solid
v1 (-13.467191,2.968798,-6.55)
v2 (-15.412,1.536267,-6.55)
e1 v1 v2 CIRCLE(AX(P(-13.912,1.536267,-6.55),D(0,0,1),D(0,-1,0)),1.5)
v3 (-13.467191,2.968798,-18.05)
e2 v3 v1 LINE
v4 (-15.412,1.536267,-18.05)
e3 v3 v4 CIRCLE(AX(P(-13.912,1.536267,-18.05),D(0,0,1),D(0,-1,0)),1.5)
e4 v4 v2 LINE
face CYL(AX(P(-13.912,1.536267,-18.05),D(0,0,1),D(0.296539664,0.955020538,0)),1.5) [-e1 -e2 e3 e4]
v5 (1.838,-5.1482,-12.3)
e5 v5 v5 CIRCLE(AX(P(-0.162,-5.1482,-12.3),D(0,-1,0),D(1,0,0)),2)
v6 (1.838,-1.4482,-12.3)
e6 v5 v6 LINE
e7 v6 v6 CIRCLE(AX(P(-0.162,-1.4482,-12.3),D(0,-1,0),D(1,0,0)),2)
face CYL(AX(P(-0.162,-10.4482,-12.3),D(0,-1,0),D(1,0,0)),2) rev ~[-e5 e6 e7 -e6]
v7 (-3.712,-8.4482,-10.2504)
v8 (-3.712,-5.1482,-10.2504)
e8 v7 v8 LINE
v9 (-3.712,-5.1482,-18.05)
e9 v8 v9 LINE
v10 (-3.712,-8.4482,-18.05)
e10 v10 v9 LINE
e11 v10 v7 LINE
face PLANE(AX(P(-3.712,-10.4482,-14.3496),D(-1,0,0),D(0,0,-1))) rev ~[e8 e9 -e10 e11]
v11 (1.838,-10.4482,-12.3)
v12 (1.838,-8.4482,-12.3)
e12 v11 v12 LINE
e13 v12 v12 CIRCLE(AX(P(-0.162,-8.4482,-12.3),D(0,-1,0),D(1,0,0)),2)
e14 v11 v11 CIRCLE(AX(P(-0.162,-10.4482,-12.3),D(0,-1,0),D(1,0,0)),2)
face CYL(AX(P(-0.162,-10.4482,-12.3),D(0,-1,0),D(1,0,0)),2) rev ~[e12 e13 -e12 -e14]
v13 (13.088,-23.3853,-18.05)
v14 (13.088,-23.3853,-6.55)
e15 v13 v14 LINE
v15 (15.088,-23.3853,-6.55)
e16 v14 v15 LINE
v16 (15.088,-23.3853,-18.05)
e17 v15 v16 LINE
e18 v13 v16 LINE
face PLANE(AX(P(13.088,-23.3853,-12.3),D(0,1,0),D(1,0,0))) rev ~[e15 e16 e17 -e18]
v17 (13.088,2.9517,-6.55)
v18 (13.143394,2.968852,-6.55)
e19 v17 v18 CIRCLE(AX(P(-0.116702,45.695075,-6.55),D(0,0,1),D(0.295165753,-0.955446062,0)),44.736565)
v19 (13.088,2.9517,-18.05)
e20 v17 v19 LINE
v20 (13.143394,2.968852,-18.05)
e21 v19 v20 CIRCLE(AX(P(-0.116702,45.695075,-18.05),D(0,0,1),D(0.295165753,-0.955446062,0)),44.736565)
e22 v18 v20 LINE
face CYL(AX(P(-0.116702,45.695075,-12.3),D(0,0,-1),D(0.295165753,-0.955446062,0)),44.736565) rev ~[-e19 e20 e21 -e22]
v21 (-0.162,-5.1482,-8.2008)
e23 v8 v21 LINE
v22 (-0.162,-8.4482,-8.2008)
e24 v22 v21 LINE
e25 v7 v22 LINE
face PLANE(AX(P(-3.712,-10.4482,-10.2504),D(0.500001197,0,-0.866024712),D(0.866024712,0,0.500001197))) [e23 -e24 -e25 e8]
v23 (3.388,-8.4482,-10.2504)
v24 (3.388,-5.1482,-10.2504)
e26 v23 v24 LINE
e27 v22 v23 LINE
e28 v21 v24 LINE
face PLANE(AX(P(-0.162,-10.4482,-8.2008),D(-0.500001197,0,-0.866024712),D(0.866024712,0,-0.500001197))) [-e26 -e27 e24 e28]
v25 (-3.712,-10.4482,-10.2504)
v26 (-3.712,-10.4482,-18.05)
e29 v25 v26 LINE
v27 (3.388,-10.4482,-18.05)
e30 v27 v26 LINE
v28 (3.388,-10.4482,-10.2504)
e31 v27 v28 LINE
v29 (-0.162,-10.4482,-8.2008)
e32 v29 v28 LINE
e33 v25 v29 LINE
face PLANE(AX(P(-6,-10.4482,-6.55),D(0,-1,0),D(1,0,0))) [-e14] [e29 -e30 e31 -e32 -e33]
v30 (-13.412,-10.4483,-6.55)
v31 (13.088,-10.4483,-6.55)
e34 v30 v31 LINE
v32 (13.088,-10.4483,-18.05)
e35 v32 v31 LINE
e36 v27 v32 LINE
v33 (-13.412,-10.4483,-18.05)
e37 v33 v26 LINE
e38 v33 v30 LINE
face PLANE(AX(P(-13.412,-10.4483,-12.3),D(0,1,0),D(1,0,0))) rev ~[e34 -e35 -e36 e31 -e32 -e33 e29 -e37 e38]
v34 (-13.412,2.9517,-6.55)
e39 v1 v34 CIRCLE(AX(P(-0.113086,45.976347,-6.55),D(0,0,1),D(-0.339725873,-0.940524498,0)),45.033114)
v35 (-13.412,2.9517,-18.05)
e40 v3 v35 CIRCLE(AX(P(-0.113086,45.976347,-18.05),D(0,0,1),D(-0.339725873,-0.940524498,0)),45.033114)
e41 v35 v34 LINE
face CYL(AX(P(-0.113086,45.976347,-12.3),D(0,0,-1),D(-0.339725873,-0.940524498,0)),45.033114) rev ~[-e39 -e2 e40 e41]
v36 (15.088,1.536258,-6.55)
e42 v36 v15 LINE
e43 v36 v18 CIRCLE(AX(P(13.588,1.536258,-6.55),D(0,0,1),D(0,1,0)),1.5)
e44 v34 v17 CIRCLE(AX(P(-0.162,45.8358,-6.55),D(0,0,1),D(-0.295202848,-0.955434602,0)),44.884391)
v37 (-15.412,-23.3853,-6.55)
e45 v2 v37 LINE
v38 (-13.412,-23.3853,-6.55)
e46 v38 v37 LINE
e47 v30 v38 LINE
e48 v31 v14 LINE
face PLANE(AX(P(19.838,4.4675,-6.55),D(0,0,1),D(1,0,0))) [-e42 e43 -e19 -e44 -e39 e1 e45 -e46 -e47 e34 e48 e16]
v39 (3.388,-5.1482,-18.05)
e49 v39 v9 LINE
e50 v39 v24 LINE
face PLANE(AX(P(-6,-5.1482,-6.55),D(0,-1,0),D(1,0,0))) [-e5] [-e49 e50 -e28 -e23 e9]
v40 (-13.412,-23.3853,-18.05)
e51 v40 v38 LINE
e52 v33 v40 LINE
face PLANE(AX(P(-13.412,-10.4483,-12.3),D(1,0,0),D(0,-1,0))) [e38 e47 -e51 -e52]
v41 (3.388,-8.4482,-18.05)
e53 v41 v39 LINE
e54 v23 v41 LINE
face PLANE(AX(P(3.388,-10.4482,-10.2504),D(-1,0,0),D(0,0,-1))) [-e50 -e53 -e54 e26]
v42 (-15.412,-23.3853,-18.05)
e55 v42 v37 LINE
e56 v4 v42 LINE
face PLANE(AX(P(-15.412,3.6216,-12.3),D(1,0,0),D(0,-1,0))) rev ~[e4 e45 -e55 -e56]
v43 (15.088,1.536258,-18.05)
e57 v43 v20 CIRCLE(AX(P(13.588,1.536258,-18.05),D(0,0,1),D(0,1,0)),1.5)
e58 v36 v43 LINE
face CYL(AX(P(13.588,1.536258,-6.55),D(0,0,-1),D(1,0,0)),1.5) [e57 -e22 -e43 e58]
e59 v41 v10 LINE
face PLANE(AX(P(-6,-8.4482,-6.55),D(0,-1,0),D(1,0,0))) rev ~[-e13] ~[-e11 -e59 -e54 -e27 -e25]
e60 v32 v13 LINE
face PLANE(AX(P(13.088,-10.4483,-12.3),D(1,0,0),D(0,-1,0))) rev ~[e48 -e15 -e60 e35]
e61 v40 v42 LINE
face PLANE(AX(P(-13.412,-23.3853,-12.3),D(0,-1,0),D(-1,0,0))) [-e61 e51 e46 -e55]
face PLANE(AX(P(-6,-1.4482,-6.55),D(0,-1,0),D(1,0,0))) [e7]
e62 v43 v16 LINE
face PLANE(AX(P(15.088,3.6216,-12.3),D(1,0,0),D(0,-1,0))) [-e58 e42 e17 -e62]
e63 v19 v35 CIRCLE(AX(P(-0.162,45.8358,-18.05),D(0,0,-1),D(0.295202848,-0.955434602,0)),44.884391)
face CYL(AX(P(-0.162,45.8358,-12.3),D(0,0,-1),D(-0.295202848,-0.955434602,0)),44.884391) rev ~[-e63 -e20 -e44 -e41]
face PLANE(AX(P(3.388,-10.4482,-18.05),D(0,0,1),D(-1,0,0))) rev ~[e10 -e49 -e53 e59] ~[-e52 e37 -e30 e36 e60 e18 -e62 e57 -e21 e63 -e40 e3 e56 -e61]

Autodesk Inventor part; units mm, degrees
ref_plane "YZ Plane" through (0, 0, 0) normal (1, 0, 0) x (0, 1, 0)
ref_plane "XZ Plane" through (0, 0, 0) normal (0, 1, 0) x (-1, 0, 0)
ref_plane "XY Plane" through (0, 0, 0) normal (0, 0, 1) x (1, 0, 0)
ref_plane "РабПлоскость2" through (19.838, 4.4675, -12.3) normal (0, 0, 1) x (1, 0, 0)
ref_plane "РабПлоскость1" through (-13.412, 18.3334, -19.05) normal (0, 0, 1) x (1, 0, 0)
sketch "Эскиз1" plane through (19.838, 4.4675, -12.3) normal (0, 0, 1) x (1, 0, 0)
  line L0 (-17.838, -7.8158) -> (-21.838, -7.8158) projected
  line L1 (-21.838, -12.9158) -> (-17.838, -12.9158) projected
  line L2 (-15.838, -12.5585) -> (-15.838, -8.173) projected
  line L3 (-23.838, -12.5585) -> (-23.838, -8.173) projected
  line L4 (-15.688, -12.9158) -> (-23.988, -12.9158)
  line L5 (-23.988, -12.9158) -> (-23.988, -7.5158)
  line L6 (-23.988, -7.5158) -> (-15.688, -7.5158)
  line L7 (-15.688, -7.5158) -> (-15.688, -12.9158)
  line L8 (-15.688, -12.9158) -> (-23.988, -7.5158) construction
  line L9 (-19.838, -4.4675) -> (-19.838, -10.2158) construction
  line L10 (-15.388, -12.9158) -> (-24.288, -12.9158)
  line L11 (-6.75, -10.8528) -> (-33.25, -10.8528) projected
  line L12 (-33.25, -10.8528) -> (-6.75, -10.8528) projected
  line L13 (-33.25, -10.8528) -> (-6.75, -10.8528) construction
  line L14 (-24.938, -14.0158) -> (-14.738, -14.0158) projected
  line L15 (-15.388, -12.9158) -> (-24.288, -12.9158)
  line L16 (-19.838, -14.0158) -> (-19.838, -12.9158) construction
  line L17 (-13.838, -13.4658) -> (-25.838, -13.4658) construction
  line L18 (-25.838, -13.4658) -> (-25.838, -3.5158)
  line L19 (-25.838, -3.5158) -> (-13.838, -3.5158)
  line L20 (-13.838, -3.5158) -> (-13.838, -13.4658)
  line L21 (-6.75, -10.8528) -> (-33.25, -10.8528)
  line L22 (-33.25, -10.8528) -> (-33.25, -3.5158) construction
  line L23 (-33.25, -3.5158) -> (-6.75, -3.5158)
  line L24 (-6.75, -3.5158) -> (-6.75, -10.8528) construction
  line L25 (-6.75, -3.5158) -> (-6.75, -1.5158) construction
  line L26 (-33.25, -3.5158) -> (-33.25, -1.5158) construction
  arc A0 (-33.25, -1.5158) -> (-6.75, -1.5158) centre (-20, 41.3683) ccw
  line L27 (-25.838, -13.4658) -> (-13.838, -13.4658) construction
  line L28 (-13.838, -13.4658) -> (-25.838, -13.4658)
  line L29 (-4.75, -0.8459) -> (-4.75, -27.8528)
  line L30 (-35.25, -0.8459) -> (-35.25, -27.8528)
  arc A1 (-35.25, -0.8459) -> (-33.25, -1.5158) centre (-20, 41.3683) ccw
  arc A2 (-6.75, -1.5158) -> (-4.75, -0.8459) centre (-20, 41.3683) ccw
  line L31 (-33.25, -14.9158) -> (-33.25, -27.8528)
  line L32 (-33.25, -27.8528) -> (-35.25, -27.8528)
  line L33 (-6.75, -14.9158) -> (-6.75, -27.8528)
  line L34 (-6.75, -27.8528) -> (-4.75, -27.8528)
  line L35 (-33.25, -14.9158) -> (-6.75, -14.9158)
  point P0 (-19.838, -13.4658)
  point P1 (-19.838, -3.5158)
  point P2 (-25.838, -10.8528)
  point P3 (-13.838, -10.8528)
  point P4 (-20.162, -3.5158)
  point P5 (-15.688, -10.8528)
  point P6 (-23.988, -10.8528)
  point P7 (-20.162, -3.5158)
  point P8 (-17.838, -12.9158)
  dimension "d0" = 8.3
  dimension "d1" = 5.4
  dimension "d2" = 12
  dimension "d3" = 4
  dimension "d4" = 2
  dimension "d10" = 0
  dimension "d11" = 0.55
  dimension "d26" = 2
  dimension "d27" = 2
  dimension "d30" = 17
  dimension "d33" = 2
extrude "Выдавливание1" add sketch "Эскиз1" along normal mid plane 11.5 contours L4 L5 L11 L7 L1 | L1 L4 L7 L11 L20 L28 L18 L5 | L11 L18 L19 L20 L7 L6 L5 | L5 L6 L7 L11 | A0 A2 L29 L34 L33 L35 L31 L32 L30 A1
sketch "Эскиз3" plane through (-6, -10.4482, -6.55) normal (0, -1, 0) x (1, 0, 0)
  circle A0 centre (5.838, -5.75) radius 2
  line L0 (19.088, -11.5) -> (19.088, 0) projected
  line L1 (-7.412, -11.5) -> (-7.412, 0) projected
  line L2 (-7.412, 0) -> (19.088, -11.5) construction
  line L3 (5.838, 12.0241) -> (5.838, -23.5241) construction
  line L4 (-15.512, -5.75) -> (27.188, -5.75) construction
  line L5 (2.288, -3.7004) -> (5.838, -1.6508)
  line L6 (5.838, -1.6508) -> (9.388, -3.7004)
  line L7 (9.388, -3.7004) -> (9.388, -7.7996)
  line L8 (9.388, -7.7996) -> (5.838, -9.8492) construction
  line L9 (5.838, -9.8492) -> (2.288, -7.7996) construction
  line L10 (2.288, -7.7996) -> (2.288, -3.7004)
  line L11 (2.288, -7.7996) -> (2.288, -12.2488)
  line L12 (9.388, -7.7996) -> (9.388, -11.5)
  line L13 (19.088, -11.5) -> (-7.412, -11.5) projected
  point P0 (6, 6.55)
  point P1 (0, 0)
  point P2 (12, -12.8)
  point P3 (2.288, -5.75)
  point P4 (2.288, -11.5)
  dimension "d12" = 4
  dimension "d34" = 3.55
extrude "Выдавливание8" cut sketch "Эскиз3" against normal blind 5.3 contours A0 | L5 L6 L7 L12 L13 L11 L10
extrude "Выдавливание9" add sketch "Эскиз3" against normal blind 2
extrude "Выдавливание10" cut sketch "Эскиз3" against normal blind 9 contours A0
fillet "Сопряжение1" radius 1.5 2 edges at (-15.412, 3.6216, -12.3) (15.088, 3.6216, -12.3)
equation "\"d27\" = d26"
properties part number "kicker1.1"
